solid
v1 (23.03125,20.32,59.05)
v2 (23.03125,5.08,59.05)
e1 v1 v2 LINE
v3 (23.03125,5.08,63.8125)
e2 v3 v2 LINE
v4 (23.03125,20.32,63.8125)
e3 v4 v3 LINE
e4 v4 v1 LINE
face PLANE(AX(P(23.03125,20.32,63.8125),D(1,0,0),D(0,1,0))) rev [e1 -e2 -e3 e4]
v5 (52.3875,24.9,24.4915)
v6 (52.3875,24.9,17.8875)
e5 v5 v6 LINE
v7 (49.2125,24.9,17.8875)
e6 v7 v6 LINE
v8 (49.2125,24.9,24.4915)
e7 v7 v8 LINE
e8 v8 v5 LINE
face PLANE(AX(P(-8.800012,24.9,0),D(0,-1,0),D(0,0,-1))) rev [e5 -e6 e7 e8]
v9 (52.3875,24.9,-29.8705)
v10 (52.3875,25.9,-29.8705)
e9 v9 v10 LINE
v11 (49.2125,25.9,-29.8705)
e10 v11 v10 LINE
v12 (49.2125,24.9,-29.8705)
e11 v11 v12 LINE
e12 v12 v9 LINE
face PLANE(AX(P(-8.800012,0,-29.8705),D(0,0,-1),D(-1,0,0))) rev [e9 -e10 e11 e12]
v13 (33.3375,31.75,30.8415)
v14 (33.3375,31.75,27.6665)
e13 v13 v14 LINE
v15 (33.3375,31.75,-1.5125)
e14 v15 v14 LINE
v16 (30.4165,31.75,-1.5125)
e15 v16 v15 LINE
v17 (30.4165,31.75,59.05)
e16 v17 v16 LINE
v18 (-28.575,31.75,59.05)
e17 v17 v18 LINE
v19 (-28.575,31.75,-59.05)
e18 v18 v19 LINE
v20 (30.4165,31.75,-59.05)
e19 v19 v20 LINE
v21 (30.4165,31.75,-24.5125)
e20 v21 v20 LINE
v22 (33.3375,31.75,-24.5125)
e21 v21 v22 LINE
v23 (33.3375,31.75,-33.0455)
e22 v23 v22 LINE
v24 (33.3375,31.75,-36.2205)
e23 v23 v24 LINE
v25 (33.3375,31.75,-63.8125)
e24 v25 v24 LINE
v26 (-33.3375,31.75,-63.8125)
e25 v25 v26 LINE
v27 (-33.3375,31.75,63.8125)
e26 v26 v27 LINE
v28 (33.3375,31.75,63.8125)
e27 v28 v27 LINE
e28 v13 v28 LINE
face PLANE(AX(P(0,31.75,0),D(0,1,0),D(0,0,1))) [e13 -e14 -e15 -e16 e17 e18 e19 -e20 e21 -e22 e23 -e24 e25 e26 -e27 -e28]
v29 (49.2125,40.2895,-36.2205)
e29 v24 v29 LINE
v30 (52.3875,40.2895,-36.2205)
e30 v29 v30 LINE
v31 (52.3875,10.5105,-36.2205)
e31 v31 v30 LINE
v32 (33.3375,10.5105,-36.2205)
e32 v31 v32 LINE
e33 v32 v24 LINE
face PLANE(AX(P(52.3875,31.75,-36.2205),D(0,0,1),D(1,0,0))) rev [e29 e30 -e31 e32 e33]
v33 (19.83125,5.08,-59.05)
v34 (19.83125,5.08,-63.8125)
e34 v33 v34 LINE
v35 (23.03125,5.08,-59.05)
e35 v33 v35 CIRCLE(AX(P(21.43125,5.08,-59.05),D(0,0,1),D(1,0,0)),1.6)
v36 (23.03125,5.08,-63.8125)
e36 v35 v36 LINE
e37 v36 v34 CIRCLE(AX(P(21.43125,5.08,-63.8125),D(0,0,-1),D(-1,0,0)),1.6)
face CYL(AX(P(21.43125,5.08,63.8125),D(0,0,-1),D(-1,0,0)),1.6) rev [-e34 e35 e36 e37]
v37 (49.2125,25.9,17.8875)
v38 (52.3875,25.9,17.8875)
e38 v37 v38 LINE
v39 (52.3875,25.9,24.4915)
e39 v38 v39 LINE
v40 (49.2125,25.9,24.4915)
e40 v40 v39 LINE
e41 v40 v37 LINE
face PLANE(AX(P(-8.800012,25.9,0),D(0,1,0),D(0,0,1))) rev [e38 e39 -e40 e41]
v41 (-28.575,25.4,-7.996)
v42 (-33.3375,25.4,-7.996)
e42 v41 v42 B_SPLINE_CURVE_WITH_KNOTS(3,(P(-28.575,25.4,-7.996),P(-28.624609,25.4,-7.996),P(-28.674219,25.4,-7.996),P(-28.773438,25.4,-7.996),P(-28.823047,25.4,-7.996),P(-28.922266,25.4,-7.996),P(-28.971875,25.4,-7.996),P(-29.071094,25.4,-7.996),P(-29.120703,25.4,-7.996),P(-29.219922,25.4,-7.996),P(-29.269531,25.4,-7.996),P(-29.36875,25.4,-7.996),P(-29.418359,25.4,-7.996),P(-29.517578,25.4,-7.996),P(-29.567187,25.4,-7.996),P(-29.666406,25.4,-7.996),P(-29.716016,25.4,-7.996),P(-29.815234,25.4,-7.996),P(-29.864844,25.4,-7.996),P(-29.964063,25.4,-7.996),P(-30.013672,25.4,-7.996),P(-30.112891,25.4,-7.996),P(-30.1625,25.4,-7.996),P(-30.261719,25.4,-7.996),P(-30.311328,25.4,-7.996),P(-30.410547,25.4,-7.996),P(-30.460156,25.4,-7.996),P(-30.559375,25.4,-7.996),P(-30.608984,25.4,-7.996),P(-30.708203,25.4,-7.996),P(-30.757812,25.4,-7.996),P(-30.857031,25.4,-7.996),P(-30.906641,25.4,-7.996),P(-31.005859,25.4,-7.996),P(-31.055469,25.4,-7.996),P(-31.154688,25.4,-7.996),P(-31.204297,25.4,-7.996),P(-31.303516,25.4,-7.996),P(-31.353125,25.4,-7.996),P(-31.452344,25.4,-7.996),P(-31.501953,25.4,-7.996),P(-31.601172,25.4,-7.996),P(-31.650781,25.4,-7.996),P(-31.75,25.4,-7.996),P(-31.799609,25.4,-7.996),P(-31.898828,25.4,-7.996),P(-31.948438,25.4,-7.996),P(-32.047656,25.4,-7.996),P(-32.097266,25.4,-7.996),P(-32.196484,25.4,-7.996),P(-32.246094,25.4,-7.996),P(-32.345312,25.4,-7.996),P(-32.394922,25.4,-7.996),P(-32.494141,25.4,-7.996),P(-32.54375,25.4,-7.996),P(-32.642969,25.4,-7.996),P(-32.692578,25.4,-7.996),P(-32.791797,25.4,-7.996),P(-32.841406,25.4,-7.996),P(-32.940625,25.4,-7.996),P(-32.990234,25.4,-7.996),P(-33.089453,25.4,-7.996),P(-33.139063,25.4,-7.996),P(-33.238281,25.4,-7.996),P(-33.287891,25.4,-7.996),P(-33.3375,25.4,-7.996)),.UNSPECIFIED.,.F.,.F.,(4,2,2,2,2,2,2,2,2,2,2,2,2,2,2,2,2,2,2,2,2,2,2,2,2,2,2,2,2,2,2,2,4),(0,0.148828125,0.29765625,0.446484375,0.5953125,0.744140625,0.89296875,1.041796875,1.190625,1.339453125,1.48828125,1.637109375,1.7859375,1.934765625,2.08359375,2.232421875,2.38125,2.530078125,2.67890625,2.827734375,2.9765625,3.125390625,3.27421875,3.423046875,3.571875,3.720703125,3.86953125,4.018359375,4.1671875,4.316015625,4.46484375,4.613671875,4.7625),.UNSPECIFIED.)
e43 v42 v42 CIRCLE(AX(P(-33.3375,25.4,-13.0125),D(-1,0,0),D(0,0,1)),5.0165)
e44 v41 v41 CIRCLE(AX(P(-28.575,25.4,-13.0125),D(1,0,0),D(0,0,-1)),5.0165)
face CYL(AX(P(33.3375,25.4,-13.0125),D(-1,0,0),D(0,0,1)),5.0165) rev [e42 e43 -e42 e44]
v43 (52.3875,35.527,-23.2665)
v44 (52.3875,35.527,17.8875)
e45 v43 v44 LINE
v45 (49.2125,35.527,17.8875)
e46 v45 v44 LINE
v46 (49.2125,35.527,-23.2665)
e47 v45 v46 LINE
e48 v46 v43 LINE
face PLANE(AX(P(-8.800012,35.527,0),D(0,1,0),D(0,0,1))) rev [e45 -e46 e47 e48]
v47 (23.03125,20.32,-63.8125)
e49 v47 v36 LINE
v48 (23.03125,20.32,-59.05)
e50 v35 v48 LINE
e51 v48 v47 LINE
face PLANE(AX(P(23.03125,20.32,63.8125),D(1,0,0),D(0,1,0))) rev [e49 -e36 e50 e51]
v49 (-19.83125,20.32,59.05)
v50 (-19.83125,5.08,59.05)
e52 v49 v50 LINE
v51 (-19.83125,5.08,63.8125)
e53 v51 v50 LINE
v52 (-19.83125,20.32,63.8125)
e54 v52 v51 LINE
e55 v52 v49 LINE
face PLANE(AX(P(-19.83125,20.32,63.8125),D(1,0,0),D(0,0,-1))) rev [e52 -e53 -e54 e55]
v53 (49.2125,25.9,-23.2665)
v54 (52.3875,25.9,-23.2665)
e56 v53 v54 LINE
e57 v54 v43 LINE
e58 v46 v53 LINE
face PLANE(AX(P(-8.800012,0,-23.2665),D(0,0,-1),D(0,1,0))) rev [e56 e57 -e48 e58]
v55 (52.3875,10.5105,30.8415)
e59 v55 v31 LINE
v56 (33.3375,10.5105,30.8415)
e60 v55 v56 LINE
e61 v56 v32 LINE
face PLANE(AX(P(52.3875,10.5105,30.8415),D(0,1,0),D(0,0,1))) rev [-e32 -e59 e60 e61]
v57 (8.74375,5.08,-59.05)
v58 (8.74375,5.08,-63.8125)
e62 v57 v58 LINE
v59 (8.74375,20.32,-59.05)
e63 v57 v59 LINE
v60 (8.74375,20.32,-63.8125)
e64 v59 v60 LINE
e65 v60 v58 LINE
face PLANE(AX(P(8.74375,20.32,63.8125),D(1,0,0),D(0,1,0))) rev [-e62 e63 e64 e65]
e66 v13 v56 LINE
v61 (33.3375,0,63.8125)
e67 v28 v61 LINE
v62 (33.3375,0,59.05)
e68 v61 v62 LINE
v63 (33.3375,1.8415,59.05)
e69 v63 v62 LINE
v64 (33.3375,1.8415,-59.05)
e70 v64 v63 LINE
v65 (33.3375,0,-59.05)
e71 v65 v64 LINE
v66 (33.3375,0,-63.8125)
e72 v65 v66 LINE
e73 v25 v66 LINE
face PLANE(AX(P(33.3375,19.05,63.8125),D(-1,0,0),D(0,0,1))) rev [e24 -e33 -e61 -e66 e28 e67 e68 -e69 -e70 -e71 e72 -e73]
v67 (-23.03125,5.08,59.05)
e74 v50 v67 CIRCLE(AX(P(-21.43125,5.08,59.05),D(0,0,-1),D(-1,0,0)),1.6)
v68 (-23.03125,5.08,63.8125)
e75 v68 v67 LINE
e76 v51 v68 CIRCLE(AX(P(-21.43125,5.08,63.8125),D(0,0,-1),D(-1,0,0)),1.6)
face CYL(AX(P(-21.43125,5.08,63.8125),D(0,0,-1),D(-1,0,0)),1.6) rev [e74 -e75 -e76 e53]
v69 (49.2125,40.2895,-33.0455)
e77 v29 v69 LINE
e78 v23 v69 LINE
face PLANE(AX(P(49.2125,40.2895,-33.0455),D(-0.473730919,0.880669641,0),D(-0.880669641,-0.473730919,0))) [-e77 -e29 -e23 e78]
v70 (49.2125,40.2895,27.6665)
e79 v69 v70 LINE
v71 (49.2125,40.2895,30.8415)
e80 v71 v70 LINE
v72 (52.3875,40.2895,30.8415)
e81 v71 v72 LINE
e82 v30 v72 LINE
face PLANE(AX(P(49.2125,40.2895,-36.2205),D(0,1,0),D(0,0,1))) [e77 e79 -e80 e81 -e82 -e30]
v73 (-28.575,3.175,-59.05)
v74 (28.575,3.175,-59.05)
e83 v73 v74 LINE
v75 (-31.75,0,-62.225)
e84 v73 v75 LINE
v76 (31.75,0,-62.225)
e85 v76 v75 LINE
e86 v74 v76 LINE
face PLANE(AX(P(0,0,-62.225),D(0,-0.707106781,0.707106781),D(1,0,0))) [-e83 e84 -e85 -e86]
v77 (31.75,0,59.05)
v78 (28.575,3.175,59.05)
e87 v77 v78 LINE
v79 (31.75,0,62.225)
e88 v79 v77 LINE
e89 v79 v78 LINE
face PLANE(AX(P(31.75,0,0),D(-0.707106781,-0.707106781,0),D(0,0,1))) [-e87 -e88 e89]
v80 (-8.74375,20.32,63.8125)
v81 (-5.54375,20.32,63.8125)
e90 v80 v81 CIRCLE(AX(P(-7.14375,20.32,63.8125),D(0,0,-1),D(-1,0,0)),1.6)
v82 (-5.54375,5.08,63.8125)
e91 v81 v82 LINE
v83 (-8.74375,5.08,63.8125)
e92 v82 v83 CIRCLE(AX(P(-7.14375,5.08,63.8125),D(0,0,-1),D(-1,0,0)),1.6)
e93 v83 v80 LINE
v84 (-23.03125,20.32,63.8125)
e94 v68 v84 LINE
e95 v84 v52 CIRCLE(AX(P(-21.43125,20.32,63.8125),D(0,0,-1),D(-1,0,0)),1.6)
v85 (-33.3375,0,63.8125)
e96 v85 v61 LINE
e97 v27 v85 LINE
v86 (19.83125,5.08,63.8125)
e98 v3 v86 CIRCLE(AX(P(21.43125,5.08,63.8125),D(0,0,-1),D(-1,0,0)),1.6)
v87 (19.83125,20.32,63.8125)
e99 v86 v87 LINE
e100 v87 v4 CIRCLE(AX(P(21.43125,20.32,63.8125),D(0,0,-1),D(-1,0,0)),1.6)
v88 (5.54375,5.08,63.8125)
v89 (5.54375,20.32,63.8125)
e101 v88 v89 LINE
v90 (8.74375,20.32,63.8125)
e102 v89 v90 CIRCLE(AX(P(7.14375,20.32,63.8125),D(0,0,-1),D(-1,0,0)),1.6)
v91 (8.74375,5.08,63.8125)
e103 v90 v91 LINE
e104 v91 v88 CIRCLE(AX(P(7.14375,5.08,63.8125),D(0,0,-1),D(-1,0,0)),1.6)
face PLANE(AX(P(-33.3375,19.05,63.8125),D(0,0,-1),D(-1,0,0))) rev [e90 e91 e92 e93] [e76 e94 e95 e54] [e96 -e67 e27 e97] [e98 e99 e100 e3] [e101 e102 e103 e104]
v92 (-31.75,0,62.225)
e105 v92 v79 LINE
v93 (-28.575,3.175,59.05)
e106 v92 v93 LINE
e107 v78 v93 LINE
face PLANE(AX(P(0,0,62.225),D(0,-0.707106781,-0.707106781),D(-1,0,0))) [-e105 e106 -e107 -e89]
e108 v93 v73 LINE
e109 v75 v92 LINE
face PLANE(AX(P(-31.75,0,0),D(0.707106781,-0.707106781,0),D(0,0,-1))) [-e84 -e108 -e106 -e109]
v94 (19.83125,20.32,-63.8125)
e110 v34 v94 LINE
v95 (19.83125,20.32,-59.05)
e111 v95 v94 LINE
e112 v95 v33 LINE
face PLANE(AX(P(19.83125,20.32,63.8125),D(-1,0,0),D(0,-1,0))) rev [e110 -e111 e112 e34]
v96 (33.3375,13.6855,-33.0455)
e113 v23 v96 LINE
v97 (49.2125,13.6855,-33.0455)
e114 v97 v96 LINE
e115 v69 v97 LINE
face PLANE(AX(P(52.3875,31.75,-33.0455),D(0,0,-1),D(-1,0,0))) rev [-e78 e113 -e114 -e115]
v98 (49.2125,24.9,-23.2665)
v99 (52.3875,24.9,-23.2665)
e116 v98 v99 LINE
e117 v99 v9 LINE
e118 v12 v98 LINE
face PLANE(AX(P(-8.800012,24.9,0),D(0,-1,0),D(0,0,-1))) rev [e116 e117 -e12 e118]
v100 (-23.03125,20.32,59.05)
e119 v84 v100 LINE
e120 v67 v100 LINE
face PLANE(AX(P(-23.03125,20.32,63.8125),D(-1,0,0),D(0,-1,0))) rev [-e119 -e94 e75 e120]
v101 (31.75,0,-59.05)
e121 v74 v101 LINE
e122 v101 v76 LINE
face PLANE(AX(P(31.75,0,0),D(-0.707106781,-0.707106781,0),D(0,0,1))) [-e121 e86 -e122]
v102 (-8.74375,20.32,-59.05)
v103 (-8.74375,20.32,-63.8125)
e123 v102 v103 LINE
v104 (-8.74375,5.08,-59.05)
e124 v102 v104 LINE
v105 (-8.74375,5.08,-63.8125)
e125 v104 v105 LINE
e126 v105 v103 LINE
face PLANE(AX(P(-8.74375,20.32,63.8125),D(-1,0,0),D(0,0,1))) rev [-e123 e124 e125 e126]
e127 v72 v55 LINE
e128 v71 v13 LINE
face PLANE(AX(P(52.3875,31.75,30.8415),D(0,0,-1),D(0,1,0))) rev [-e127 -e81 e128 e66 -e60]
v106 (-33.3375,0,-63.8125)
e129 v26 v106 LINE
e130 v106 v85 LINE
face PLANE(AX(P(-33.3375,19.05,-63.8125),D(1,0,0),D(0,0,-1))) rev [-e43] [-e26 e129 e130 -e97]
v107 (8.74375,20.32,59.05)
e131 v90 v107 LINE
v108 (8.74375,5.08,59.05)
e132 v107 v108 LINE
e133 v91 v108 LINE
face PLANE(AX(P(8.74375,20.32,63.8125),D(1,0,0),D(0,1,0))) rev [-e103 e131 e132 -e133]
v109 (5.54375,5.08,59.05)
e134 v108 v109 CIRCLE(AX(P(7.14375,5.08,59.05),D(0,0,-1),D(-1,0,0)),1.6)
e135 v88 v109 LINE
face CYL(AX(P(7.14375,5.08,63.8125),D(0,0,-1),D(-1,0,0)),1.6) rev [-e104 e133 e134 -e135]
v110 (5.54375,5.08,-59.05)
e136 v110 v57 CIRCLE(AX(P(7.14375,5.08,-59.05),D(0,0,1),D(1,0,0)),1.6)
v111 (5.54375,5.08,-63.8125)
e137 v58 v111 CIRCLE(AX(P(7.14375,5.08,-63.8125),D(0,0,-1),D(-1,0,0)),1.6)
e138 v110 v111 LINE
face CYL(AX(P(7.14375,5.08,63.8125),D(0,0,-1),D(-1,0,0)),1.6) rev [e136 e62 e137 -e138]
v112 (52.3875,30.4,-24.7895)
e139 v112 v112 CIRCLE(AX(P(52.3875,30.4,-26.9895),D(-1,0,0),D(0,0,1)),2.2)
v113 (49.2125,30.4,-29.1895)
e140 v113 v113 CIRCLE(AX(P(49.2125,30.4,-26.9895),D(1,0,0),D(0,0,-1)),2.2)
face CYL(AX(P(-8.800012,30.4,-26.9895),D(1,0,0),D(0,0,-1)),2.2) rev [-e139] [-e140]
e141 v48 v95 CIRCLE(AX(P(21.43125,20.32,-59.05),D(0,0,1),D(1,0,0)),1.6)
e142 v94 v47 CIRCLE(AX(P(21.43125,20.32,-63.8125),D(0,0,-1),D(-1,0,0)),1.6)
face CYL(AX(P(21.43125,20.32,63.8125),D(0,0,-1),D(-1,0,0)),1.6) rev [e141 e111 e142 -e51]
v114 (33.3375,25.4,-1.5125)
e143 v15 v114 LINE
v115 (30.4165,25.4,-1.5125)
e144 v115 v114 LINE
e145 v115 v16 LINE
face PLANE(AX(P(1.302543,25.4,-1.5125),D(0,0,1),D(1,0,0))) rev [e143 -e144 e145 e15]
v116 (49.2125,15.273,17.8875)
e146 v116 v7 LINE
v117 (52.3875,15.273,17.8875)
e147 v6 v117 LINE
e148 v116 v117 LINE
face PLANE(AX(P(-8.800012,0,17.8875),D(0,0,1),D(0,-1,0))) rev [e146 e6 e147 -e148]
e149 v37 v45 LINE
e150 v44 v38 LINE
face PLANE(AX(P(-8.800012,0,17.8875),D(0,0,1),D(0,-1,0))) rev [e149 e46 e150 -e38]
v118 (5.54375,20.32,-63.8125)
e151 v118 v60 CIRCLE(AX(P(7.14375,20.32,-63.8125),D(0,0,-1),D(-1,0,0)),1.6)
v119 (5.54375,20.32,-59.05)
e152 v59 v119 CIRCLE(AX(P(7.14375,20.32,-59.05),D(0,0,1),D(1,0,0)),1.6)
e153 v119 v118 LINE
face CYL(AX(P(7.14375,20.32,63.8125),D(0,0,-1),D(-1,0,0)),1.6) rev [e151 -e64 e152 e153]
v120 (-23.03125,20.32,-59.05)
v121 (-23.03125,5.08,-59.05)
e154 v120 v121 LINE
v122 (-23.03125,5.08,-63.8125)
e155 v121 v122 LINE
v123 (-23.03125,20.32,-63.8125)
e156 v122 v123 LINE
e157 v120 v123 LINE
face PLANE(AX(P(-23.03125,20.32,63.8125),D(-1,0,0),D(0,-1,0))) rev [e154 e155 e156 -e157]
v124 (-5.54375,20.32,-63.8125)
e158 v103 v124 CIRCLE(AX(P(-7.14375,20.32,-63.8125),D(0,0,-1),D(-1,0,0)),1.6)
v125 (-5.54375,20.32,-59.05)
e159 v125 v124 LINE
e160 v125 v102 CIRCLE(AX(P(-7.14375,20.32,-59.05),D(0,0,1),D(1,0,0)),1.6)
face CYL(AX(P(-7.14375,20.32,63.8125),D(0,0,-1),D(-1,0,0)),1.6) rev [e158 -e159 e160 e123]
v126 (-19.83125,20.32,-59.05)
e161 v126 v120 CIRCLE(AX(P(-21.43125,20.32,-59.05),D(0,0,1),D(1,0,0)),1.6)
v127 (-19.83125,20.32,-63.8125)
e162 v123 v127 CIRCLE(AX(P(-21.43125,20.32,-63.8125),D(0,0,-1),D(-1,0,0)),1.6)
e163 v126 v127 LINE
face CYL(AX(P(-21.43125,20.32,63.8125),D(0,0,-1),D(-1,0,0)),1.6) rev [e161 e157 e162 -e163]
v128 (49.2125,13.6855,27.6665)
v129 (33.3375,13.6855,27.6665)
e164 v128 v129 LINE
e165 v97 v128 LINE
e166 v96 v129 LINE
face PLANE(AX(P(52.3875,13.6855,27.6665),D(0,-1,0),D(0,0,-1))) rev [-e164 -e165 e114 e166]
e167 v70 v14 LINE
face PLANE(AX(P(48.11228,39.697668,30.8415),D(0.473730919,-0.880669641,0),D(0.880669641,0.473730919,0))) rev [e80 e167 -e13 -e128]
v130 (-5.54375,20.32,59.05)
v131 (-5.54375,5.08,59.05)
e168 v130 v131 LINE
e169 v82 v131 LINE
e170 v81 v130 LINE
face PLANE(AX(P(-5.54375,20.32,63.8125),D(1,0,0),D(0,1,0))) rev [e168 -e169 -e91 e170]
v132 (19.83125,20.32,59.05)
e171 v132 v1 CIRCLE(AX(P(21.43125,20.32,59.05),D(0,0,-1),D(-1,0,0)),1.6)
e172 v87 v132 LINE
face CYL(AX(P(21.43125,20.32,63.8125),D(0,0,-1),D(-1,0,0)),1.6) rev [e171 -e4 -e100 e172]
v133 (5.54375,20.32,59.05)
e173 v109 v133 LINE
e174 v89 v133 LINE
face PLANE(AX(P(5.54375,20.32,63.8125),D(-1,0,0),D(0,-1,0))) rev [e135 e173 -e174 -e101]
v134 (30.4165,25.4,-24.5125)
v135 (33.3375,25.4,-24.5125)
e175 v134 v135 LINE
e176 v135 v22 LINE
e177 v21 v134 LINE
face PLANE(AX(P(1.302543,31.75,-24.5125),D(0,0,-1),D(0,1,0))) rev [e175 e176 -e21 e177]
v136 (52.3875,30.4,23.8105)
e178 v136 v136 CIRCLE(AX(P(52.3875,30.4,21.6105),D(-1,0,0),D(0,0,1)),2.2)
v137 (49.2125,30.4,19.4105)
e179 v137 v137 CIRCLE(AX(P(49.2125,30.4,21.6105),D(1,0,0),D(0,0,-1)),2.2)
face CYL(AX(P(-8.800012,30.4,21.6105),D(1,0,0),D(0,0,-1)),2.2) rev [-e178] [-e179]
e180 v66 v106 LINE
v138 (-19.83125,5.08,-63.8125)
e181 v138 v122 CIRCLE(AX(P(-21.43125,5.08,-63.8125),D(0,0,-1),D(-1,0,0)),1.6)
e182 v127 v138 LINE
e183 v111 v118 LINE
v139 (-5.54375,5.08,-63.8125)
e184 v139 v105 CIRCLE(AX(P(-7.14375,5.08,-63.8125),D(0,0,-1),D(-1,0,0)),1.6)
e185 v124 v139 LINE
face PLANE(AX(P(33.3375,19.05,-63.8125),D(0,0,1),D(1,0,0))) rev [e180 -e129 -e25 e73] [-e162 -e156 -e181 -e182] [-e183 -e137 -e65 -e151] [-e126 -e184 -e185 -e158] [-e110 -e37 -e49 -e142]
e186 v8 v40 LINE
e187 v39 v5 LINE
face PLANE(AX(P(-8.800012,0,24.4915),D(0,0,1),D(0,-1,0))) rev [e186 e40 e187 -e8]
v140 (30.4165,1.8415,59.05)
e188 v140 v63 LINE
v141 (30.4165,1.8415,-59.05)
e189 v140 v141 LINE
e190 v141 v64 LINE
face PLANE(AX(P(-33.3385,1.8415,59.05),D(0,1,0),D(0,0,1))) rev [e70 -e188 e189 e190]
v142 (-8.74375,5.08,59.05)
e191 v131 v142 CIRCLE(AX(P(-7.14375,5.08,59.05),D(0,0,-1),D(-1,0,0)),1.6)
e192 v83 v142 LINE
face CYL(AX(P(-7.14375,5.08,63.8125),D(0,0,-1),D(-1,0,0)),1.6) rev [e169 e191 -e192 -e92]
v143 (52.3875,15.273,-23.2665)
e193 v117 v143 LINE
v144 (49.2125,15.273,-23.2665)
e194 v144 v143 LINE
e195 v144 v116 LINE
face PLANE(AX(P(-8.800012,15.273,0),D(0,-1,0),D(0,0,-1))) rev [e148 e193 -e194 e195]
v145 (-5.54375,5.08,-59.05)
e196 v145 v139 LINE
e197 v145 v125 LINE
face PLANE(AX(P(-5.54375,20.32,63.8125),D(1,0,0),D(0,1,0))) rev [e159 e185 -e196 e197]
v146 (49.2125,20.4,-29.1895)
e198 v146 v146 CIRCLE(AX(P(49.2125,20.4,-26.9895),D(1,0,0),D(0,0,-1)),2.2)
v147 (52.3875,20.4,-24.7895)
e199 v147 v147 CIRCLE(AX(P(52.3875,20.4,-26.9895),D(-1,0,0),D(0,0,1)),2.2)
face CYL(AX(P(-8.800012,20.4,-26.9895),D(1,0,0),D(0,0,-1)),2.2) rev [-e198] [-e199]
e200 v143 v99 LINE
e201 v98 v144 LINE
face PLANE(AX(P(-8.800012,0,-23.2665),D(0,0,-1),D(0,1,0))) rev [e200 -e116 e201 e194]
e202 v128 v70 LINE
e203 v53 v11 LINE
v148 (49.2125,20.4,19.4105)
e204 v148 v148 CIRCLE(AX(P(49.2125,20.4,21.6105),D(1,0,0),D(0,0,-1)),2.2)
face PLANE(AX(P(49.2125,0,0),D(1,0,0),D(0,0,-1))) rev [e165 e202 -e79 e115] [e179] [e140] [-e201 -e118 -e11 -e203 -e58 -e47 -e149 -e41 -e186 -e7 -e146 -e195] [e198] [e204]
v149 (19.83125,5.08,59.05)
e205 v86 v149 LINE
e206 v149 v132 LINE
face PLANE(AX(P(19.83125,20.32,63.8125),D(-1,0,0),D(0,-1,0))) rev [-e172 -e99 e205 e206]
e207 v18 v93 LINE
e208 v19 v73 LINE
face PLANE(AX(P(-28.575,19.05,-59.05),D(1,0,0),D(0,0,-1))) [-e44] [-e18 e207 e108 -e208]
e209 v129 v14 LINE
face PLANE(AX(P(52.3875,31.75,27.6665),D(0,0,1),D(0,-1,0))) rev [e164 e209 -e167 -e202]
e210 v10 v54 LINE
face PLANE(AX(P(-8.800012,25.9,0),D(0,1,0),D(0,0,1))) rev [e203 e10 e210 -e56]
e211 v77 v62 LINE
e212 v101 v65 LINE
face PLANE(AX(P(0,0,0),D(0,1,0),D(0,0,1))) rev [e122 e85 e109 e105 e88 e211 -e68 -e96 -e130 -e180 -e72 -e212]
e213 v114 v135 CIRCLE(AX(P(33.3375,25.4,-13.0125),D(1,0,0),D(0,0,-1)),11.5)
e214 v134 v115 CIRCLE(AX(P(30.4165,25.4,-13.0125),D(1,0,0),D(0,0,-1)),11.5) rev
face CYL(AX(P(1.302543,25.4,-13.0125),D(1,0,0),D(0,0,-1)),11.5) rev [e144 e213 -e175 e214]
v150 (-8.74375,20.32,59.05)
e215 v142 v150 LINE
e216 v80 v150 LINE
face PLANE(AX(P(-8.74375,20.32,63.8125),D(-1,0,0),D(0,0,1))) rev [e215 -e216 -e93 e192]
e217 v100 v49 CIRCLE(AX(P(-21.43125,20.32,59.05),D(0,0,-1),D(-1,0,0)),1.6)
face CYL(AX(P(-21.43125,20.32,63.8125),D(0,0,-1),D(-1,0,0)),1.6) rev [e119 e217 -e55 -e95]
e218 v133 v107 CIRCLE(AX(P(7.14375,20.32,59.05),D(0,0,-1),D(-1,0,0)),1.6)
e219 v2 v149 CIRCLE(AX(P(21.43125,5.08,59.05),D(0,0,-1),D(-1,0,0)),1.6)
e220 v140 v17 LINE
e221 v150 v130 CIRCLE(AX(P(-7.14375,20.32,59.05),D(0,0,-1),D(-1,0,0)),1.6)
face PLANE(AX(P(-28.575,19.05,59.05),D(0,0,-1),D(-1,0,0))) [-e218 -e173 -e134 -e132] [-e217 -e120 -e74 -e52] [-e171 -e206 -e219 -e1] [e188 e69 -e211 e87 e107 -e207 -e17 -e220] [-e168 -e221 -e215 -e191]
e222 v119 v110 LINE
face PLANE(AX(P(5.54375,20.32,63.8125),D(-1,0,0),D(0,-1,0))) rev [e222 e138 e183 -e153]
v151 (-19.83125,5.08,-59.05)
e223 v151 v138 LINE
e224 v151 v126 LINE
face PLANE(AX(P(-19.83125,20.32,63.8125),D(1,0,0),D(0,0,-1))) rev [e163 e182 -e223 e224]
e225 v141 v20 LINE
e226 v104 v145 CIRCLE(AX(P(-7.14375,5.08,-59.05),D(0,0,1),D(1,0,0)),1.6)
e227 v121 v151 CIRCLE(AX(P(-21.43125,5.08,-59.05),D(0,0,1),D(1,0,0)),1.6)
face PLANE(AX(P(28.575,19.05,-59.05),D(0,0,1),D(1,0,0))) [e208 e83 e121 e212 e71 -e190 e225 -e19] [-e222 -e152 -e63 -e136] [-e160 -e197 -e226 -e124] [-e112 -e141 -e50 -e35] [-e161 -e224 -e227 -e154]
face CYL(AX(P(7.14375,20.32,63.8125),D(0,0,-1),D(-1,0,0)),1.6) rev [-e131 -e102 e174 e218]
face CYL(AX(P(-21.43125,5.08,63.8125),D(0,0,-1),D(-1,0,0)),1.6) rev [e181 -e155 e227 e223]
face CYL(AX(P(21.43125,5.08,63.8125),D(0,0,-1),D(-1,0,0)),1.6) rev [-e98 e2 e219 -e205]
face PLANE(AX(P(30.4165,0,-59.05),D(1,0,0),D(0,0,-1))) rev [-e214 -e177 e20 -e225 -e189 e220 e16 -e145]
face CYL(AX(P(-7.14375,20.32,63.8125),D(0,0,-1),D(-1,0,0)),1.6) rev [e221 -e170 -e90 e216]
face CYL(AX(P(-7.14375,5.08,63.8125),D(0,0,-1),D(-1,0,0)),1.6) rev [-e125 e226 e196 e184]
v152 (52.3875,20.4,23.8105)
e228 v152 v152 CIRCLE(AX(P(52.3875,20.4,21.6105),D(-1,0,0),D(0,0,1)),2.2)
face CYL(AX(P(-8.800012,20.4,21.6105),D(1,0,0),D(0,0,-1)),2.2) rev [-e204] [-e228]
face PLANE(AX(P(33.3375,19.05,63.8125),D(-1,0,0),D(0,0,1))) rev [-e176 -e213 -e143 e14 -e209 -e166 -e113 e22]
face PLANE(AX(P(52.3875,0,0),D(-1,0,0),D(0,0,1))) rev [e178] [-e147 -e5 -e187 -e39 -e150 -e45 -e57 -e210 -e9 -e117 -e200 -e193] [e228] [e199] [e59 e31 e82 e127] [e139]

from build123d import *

# Parameters (mm, degrees)
SKETCH4_W                = 66.675
SKETCH4_H                = 127.62500002
SKETCH4_W_2              = 57.15
SKETCH4_H_2              = 118.10000002
BOSS_EXTRUDE1_DEPTH      = 19.05
BOSS_EXTRUDE2_START      = 19.05
SKETCH5_W                = 66.675
SKETCH5_H                = 127.62500002
BOSS_EXTRUDE2_DEPTH      = 12.7
FILLET1_SIZE             = 3.175
SKETCH14_W               = 57.15
SKETCH14_H               = 118.10000002
CUT_EXTRUDE8_DEPTH       = 12.7
SKETCH26_W               = 1.8415
SKETCH26_H               = 118.10000002
CUT_EXTRUDE11_DEPTH      = 79.685999795
CUT_EXTRUDE12_REACH      = 99.599
SKETCH27_W               = 118.10000002
SKETCH27_H               = 1.8415
SKETCH30_R               = 5.0165
CUT_EXTRUDE13_DEPTH      = 98.59945329
CUT_EXTRUDE16_DEPTH      = 2.921
BOSS_EXTRUDE4_DEPTH      = 19.05
SKETCH34_W               = 67.061999988
SKETCH34_H               = 29.778999878
BOSS_EXTRUDE5_DEPTH      = 3.175
CUT_EXTRUDE17_START      = 19.05
SKETCH32_R               = 2.200000045
CUT_EXTRUDE17_DEPTH      = 3.175
BOSS_EXTRUDE6_DEPTH      = 3.175
BOSS_EXTRUDE8_START      = -63.887
BOSS_EXTRUDE8_DEPTH      = 3.175
CUT_EXTRUDE18_DEPTH      = 144.721378339
CUT_EXTRUDE18_DEPTH_BACK = 144.721378339


with BuildPart() as part:
    # Sketch4 → Boss-Extrude1 (new body)
    with BuildSketch(Plane(origin=(0, 0, 0), x_dir=(1, 0, 0), z_dir=(0, 1, 0))):
        Rectangle(SKETCH4_W, SKETCH4_H)
        Rectangle(SKETCH4_W_2, SKETCH4_H_2, mode=Mode.SUBTRACT)
    extrude(amount=BOSS_EXTRUDE1_DEPTH)

    # Sketch5 → Boss-Extrude2 (add)
    with BuildSketch(Plane(origin=(0, 0, 0), x_dir=(1, 0, 0), z_dir=(0, 1, 0)).offset(BOSS_EXTRUDE2_START)):
        Rectangle(SKETCH5_W, SKETCH5_H)
    extrude(amount=BOSS_EXTRUDE2_DEPTH)

    # Fillet1
    fillet1_edges = [part.edges().sort_by_distance(p)[0] for p in [
        (-28.575, 0, 0),
        (0, 0, 59.05000001),
        (28.575, 0, 0),
        (0, 0, -59.05000001),
    ]]
    chamfer(fillet1_edges, length=FILLET1_SIZE)

    # Sketch14 → Cut-Extrude8 (cut)
    with BuildSketch(Plane.XZ.offset(-19.05)):
        Rectangle(SKETCH14_W, SKETCH14_H)
    extrude(amount=-CUT_EXTRUDE8_DEPTH, mode=Mode.SUBTRACT)

    # Sketch26 → Cut-Extrude11 (cut, through all)
    with BuildSketch(Plane(origin=(0, 31.75, 0), x_dir=(1, 0, 0), z_dir=(0, 1, 0))):
        with Locations((29.49575, 0)):
            Rectangle(SKETCH26_W, SKETCH26_H)
    extrude(amount=-CUT_EXTRUDE11_DEPTH, mode=Mode.SUBTRACT)

    # Sketch27 → Cut-Extrude12 (cut, up to next)
    with BuildSketch(Plane(origin=(33.3375, 0, 0), x_dir=(0, 0, -1), z_dir=(1, 0, 0)), mode=Mode.PRIVATE) as cut_extrude12_sk1:
        with Locations((0, 0.92075)):
            Rectangle(SKETCH27_W, SKETCH27_H)
    cut_extrude12_tool1 = extrude(cut_extrude12_sk1.sketch, amount=-CUT_EXTRUDE12_REACH, mode=Mode.PRIVATE) & part.part
    add(cut_extrude12_tool1.solids().sort_by_distance((33.3375, 0.92075, 0))[0], mode=Mode.SUBTRACT)

    # Sketch30 → Cut-Extrude13 (cut, through all)
    with BuildSketch(Plane.ZY.offset(33.3375)):
        with Locations((-13.01250001, 25.4)):
            Circle(SKETCH30_R)
    extrude(amount=-CUT_EXTRUDE13_DEPTH, mode=Mode.SUBTRACT)

    # Sketch31 → Cut-Extrude16 (cut)
    with BuildSketch(Plane(origin=(33.3375, 0, 0), x_dir=(0, 0, -1), z_dir=(1, 0, 0))):
        with BuildLine():
            Line((1.512500023, 25.4), (1.512500023, 31.75))
            Line((1.512500023, 31.75), (24.512499997, 31.75))
            Line((24.512499997, 31.75), (24.512499997, 25.4))
            ThreePointArc((24.512499997, 25.4), (13.01250001, 13.900000013), (1.512500023, 25.4))
        make_face()
    extrude(amount=-CUT_EXTRUDE16_DEPTH, mode=Mode.SUBTRACT)

    # Sketch33 → Boss-Extrude4 (add)
    with BuildSketch(Plane(origin=(33.3375, 0, 0), x_dir=(0, 0, -1), z_dir=(1, 0, 0))):
        Polygon((-27.666499912, 31.75), (-27.666499912, 13.685500061), (33.045500076, 13.685500061), (33.045500076, 31.75), (36.220500076, 31.75), (36.220500076, 10.510500061), (-30.841499912, 10.510500061), (-30.841499912, 31.75), align=None)
    extrude(amount=BOSS_EXTRUDE4_DEPTH)

    # Sketch34 → Boss-Extrude5 (add)
    with BuildSketch(Plane(origin=(52.3875, 0, 0), x_dir=(0, 0, -1), z_dir=(1, 0, 0))):
        with Locations((2.689500082, 25.4)):
            Rectangle(SKETCH34_W, SKETCH34_H)
    extrude(amount=-BOSS_EXTRUDE5_DEPTH)

    # Sketch32 → Cut-Extrude17 (cut)
    with BuildSketch(Plane(origin=(33.3375, 0, 0), x_dir=(0, 0, -1), z_dir=(1, 0, 0)).offset(CUT_EXTRUDE17_START)):
        with Locations((26.989500123, 30.400000033)):
            Circle(SKETCH32_R)
        with Locations((26.989500123, 20.399999967)):
            Circle(SKETCH32_R)
        with Locations((-21.610499959, 30.400000033)):
            Circle(SKETCH32_R)
        with Locations((-21.610499959, 20.399999967)):
            Circle(SKETCH32_R)
        Polygon((23.266500076, 15.273000061), (23.266500076, 24.9), (29.870500076, 24.9), (29.870500076, 25.9), (23.266500076, 25.9), (23.266500076, 35.526999939), (-17.887499912, 35.526999939), (-17.887499912, 25.9), (-24.491499912, 25.9), (-24.491499912, 24.9), (-17.887499912, 24.9), (-17.887499912, 15.273000061), align=None)
    extrude(amount=-CUT_EXTRUDE17_DEPTH, mode=Mode.SUBTRACT)

    # Sketch35 → Boss-Extrude6 (add)
    with BuildSketch(Plane(origin=(0, 0, -36.220500076), x_dir=(-1, 0, 0), z_dir=(0, 0, -1))):
        Polygon((-49.2125, 40.289499939), (-33.3375, 31.75), (-49.2125, 31.75), align=None)
    extrude(amount=-BOSS_EXTRUDE6_DEPTH)

    # Sketch35<2> → Boss-Extrude8 (add)
    with BuildSketch(Plane(origin=(0, 0, -36.220500076), x_dir=(-1, 0, 0), z_dir=(0, 0, -1)).offset(BOSS_EXTRUDE8_START)):
        Polygon((-49.2125, 40.289499939), (-33.3375, 31.75), (-49.2125, 31.75), align=None)
    extrude(amount=-BOSS_EXTRUDE8_DEPTH)

    # Sketch40 → Cut-Extrude18 (cut, two sides: drawn at the far end of the back side and taken through both)
    with BuildSketch(Plane(origin=(0, 0, -63.81250001), x_dir=(-1, 0, 0), z_dir=(0, 0, -1)).offset(-CUT_EXTRUDE18_DEPTH_BACK)):
        with BuildLine():
            Line((-5.543749898, 20.32), (-5.543749898, 5.08))
            ThreePointArc((-5.543749898, 5.08), (-7.14375, 3.479999898), (-8.743750102, 5.08))
            Line((-8.743750102, 5.08), (-8.743750102, 20.32))
            ThreePointArc((-8.743750102, 20.32), (-7.14375, 21.920000102), (-5.543749898, 20.32))
        make_face()
        with BuildLine():
            Line((8.743750102, 20.32), (8.743750102, 5.08))
            ThreePointArc((8.743750102, 5.08), (7.14375, 3.479999898), (5.543749898, 5.08))
            Line((5.543749898, 5.08), (5.543749898, 20.32))
            ThreePointArc((5.543749898, 20.32), (7.14375, 21.920000102), (8.743750102, 20.32))
        make_face()
        with BuildLine():
            Line((23.031250102, 20.32), (23.031250102, 5.08))
            ThreePointArc((23.031250102, 5.08), (21.43125, 3.479999898), (19.831249898, 5.08))
            Line((19.831249898, 5.08), (19.831249898, 20.32))
            ThreePointArc((19.831249898, 20.32), (21.43125, 21.920000102), (23.031250102, 20.32))
        make_face()
        with BuildLine():
            Line((-19.831249898, 20.32), (-19.831249898, 5.08))
            ThreePointArc((-19.831249898, 5.08), (-21.43125, 3.479999898), (-23.031250102, 5.08))
            Line((-23.031250102, 5.08), (-23.031250102, 20.32))
            ThreePointArc((-23.031250102, 20.32), (-21.43125, 21.920000102), (-19.831249898, 20.32))
        make_face()
    extrude(amount=CUT_EXTRUDE18_DEPTH + CUT_EXTRUDE18_DEPTH_BACK, mode=Mode.SUBTRACT)


solid = part.part
